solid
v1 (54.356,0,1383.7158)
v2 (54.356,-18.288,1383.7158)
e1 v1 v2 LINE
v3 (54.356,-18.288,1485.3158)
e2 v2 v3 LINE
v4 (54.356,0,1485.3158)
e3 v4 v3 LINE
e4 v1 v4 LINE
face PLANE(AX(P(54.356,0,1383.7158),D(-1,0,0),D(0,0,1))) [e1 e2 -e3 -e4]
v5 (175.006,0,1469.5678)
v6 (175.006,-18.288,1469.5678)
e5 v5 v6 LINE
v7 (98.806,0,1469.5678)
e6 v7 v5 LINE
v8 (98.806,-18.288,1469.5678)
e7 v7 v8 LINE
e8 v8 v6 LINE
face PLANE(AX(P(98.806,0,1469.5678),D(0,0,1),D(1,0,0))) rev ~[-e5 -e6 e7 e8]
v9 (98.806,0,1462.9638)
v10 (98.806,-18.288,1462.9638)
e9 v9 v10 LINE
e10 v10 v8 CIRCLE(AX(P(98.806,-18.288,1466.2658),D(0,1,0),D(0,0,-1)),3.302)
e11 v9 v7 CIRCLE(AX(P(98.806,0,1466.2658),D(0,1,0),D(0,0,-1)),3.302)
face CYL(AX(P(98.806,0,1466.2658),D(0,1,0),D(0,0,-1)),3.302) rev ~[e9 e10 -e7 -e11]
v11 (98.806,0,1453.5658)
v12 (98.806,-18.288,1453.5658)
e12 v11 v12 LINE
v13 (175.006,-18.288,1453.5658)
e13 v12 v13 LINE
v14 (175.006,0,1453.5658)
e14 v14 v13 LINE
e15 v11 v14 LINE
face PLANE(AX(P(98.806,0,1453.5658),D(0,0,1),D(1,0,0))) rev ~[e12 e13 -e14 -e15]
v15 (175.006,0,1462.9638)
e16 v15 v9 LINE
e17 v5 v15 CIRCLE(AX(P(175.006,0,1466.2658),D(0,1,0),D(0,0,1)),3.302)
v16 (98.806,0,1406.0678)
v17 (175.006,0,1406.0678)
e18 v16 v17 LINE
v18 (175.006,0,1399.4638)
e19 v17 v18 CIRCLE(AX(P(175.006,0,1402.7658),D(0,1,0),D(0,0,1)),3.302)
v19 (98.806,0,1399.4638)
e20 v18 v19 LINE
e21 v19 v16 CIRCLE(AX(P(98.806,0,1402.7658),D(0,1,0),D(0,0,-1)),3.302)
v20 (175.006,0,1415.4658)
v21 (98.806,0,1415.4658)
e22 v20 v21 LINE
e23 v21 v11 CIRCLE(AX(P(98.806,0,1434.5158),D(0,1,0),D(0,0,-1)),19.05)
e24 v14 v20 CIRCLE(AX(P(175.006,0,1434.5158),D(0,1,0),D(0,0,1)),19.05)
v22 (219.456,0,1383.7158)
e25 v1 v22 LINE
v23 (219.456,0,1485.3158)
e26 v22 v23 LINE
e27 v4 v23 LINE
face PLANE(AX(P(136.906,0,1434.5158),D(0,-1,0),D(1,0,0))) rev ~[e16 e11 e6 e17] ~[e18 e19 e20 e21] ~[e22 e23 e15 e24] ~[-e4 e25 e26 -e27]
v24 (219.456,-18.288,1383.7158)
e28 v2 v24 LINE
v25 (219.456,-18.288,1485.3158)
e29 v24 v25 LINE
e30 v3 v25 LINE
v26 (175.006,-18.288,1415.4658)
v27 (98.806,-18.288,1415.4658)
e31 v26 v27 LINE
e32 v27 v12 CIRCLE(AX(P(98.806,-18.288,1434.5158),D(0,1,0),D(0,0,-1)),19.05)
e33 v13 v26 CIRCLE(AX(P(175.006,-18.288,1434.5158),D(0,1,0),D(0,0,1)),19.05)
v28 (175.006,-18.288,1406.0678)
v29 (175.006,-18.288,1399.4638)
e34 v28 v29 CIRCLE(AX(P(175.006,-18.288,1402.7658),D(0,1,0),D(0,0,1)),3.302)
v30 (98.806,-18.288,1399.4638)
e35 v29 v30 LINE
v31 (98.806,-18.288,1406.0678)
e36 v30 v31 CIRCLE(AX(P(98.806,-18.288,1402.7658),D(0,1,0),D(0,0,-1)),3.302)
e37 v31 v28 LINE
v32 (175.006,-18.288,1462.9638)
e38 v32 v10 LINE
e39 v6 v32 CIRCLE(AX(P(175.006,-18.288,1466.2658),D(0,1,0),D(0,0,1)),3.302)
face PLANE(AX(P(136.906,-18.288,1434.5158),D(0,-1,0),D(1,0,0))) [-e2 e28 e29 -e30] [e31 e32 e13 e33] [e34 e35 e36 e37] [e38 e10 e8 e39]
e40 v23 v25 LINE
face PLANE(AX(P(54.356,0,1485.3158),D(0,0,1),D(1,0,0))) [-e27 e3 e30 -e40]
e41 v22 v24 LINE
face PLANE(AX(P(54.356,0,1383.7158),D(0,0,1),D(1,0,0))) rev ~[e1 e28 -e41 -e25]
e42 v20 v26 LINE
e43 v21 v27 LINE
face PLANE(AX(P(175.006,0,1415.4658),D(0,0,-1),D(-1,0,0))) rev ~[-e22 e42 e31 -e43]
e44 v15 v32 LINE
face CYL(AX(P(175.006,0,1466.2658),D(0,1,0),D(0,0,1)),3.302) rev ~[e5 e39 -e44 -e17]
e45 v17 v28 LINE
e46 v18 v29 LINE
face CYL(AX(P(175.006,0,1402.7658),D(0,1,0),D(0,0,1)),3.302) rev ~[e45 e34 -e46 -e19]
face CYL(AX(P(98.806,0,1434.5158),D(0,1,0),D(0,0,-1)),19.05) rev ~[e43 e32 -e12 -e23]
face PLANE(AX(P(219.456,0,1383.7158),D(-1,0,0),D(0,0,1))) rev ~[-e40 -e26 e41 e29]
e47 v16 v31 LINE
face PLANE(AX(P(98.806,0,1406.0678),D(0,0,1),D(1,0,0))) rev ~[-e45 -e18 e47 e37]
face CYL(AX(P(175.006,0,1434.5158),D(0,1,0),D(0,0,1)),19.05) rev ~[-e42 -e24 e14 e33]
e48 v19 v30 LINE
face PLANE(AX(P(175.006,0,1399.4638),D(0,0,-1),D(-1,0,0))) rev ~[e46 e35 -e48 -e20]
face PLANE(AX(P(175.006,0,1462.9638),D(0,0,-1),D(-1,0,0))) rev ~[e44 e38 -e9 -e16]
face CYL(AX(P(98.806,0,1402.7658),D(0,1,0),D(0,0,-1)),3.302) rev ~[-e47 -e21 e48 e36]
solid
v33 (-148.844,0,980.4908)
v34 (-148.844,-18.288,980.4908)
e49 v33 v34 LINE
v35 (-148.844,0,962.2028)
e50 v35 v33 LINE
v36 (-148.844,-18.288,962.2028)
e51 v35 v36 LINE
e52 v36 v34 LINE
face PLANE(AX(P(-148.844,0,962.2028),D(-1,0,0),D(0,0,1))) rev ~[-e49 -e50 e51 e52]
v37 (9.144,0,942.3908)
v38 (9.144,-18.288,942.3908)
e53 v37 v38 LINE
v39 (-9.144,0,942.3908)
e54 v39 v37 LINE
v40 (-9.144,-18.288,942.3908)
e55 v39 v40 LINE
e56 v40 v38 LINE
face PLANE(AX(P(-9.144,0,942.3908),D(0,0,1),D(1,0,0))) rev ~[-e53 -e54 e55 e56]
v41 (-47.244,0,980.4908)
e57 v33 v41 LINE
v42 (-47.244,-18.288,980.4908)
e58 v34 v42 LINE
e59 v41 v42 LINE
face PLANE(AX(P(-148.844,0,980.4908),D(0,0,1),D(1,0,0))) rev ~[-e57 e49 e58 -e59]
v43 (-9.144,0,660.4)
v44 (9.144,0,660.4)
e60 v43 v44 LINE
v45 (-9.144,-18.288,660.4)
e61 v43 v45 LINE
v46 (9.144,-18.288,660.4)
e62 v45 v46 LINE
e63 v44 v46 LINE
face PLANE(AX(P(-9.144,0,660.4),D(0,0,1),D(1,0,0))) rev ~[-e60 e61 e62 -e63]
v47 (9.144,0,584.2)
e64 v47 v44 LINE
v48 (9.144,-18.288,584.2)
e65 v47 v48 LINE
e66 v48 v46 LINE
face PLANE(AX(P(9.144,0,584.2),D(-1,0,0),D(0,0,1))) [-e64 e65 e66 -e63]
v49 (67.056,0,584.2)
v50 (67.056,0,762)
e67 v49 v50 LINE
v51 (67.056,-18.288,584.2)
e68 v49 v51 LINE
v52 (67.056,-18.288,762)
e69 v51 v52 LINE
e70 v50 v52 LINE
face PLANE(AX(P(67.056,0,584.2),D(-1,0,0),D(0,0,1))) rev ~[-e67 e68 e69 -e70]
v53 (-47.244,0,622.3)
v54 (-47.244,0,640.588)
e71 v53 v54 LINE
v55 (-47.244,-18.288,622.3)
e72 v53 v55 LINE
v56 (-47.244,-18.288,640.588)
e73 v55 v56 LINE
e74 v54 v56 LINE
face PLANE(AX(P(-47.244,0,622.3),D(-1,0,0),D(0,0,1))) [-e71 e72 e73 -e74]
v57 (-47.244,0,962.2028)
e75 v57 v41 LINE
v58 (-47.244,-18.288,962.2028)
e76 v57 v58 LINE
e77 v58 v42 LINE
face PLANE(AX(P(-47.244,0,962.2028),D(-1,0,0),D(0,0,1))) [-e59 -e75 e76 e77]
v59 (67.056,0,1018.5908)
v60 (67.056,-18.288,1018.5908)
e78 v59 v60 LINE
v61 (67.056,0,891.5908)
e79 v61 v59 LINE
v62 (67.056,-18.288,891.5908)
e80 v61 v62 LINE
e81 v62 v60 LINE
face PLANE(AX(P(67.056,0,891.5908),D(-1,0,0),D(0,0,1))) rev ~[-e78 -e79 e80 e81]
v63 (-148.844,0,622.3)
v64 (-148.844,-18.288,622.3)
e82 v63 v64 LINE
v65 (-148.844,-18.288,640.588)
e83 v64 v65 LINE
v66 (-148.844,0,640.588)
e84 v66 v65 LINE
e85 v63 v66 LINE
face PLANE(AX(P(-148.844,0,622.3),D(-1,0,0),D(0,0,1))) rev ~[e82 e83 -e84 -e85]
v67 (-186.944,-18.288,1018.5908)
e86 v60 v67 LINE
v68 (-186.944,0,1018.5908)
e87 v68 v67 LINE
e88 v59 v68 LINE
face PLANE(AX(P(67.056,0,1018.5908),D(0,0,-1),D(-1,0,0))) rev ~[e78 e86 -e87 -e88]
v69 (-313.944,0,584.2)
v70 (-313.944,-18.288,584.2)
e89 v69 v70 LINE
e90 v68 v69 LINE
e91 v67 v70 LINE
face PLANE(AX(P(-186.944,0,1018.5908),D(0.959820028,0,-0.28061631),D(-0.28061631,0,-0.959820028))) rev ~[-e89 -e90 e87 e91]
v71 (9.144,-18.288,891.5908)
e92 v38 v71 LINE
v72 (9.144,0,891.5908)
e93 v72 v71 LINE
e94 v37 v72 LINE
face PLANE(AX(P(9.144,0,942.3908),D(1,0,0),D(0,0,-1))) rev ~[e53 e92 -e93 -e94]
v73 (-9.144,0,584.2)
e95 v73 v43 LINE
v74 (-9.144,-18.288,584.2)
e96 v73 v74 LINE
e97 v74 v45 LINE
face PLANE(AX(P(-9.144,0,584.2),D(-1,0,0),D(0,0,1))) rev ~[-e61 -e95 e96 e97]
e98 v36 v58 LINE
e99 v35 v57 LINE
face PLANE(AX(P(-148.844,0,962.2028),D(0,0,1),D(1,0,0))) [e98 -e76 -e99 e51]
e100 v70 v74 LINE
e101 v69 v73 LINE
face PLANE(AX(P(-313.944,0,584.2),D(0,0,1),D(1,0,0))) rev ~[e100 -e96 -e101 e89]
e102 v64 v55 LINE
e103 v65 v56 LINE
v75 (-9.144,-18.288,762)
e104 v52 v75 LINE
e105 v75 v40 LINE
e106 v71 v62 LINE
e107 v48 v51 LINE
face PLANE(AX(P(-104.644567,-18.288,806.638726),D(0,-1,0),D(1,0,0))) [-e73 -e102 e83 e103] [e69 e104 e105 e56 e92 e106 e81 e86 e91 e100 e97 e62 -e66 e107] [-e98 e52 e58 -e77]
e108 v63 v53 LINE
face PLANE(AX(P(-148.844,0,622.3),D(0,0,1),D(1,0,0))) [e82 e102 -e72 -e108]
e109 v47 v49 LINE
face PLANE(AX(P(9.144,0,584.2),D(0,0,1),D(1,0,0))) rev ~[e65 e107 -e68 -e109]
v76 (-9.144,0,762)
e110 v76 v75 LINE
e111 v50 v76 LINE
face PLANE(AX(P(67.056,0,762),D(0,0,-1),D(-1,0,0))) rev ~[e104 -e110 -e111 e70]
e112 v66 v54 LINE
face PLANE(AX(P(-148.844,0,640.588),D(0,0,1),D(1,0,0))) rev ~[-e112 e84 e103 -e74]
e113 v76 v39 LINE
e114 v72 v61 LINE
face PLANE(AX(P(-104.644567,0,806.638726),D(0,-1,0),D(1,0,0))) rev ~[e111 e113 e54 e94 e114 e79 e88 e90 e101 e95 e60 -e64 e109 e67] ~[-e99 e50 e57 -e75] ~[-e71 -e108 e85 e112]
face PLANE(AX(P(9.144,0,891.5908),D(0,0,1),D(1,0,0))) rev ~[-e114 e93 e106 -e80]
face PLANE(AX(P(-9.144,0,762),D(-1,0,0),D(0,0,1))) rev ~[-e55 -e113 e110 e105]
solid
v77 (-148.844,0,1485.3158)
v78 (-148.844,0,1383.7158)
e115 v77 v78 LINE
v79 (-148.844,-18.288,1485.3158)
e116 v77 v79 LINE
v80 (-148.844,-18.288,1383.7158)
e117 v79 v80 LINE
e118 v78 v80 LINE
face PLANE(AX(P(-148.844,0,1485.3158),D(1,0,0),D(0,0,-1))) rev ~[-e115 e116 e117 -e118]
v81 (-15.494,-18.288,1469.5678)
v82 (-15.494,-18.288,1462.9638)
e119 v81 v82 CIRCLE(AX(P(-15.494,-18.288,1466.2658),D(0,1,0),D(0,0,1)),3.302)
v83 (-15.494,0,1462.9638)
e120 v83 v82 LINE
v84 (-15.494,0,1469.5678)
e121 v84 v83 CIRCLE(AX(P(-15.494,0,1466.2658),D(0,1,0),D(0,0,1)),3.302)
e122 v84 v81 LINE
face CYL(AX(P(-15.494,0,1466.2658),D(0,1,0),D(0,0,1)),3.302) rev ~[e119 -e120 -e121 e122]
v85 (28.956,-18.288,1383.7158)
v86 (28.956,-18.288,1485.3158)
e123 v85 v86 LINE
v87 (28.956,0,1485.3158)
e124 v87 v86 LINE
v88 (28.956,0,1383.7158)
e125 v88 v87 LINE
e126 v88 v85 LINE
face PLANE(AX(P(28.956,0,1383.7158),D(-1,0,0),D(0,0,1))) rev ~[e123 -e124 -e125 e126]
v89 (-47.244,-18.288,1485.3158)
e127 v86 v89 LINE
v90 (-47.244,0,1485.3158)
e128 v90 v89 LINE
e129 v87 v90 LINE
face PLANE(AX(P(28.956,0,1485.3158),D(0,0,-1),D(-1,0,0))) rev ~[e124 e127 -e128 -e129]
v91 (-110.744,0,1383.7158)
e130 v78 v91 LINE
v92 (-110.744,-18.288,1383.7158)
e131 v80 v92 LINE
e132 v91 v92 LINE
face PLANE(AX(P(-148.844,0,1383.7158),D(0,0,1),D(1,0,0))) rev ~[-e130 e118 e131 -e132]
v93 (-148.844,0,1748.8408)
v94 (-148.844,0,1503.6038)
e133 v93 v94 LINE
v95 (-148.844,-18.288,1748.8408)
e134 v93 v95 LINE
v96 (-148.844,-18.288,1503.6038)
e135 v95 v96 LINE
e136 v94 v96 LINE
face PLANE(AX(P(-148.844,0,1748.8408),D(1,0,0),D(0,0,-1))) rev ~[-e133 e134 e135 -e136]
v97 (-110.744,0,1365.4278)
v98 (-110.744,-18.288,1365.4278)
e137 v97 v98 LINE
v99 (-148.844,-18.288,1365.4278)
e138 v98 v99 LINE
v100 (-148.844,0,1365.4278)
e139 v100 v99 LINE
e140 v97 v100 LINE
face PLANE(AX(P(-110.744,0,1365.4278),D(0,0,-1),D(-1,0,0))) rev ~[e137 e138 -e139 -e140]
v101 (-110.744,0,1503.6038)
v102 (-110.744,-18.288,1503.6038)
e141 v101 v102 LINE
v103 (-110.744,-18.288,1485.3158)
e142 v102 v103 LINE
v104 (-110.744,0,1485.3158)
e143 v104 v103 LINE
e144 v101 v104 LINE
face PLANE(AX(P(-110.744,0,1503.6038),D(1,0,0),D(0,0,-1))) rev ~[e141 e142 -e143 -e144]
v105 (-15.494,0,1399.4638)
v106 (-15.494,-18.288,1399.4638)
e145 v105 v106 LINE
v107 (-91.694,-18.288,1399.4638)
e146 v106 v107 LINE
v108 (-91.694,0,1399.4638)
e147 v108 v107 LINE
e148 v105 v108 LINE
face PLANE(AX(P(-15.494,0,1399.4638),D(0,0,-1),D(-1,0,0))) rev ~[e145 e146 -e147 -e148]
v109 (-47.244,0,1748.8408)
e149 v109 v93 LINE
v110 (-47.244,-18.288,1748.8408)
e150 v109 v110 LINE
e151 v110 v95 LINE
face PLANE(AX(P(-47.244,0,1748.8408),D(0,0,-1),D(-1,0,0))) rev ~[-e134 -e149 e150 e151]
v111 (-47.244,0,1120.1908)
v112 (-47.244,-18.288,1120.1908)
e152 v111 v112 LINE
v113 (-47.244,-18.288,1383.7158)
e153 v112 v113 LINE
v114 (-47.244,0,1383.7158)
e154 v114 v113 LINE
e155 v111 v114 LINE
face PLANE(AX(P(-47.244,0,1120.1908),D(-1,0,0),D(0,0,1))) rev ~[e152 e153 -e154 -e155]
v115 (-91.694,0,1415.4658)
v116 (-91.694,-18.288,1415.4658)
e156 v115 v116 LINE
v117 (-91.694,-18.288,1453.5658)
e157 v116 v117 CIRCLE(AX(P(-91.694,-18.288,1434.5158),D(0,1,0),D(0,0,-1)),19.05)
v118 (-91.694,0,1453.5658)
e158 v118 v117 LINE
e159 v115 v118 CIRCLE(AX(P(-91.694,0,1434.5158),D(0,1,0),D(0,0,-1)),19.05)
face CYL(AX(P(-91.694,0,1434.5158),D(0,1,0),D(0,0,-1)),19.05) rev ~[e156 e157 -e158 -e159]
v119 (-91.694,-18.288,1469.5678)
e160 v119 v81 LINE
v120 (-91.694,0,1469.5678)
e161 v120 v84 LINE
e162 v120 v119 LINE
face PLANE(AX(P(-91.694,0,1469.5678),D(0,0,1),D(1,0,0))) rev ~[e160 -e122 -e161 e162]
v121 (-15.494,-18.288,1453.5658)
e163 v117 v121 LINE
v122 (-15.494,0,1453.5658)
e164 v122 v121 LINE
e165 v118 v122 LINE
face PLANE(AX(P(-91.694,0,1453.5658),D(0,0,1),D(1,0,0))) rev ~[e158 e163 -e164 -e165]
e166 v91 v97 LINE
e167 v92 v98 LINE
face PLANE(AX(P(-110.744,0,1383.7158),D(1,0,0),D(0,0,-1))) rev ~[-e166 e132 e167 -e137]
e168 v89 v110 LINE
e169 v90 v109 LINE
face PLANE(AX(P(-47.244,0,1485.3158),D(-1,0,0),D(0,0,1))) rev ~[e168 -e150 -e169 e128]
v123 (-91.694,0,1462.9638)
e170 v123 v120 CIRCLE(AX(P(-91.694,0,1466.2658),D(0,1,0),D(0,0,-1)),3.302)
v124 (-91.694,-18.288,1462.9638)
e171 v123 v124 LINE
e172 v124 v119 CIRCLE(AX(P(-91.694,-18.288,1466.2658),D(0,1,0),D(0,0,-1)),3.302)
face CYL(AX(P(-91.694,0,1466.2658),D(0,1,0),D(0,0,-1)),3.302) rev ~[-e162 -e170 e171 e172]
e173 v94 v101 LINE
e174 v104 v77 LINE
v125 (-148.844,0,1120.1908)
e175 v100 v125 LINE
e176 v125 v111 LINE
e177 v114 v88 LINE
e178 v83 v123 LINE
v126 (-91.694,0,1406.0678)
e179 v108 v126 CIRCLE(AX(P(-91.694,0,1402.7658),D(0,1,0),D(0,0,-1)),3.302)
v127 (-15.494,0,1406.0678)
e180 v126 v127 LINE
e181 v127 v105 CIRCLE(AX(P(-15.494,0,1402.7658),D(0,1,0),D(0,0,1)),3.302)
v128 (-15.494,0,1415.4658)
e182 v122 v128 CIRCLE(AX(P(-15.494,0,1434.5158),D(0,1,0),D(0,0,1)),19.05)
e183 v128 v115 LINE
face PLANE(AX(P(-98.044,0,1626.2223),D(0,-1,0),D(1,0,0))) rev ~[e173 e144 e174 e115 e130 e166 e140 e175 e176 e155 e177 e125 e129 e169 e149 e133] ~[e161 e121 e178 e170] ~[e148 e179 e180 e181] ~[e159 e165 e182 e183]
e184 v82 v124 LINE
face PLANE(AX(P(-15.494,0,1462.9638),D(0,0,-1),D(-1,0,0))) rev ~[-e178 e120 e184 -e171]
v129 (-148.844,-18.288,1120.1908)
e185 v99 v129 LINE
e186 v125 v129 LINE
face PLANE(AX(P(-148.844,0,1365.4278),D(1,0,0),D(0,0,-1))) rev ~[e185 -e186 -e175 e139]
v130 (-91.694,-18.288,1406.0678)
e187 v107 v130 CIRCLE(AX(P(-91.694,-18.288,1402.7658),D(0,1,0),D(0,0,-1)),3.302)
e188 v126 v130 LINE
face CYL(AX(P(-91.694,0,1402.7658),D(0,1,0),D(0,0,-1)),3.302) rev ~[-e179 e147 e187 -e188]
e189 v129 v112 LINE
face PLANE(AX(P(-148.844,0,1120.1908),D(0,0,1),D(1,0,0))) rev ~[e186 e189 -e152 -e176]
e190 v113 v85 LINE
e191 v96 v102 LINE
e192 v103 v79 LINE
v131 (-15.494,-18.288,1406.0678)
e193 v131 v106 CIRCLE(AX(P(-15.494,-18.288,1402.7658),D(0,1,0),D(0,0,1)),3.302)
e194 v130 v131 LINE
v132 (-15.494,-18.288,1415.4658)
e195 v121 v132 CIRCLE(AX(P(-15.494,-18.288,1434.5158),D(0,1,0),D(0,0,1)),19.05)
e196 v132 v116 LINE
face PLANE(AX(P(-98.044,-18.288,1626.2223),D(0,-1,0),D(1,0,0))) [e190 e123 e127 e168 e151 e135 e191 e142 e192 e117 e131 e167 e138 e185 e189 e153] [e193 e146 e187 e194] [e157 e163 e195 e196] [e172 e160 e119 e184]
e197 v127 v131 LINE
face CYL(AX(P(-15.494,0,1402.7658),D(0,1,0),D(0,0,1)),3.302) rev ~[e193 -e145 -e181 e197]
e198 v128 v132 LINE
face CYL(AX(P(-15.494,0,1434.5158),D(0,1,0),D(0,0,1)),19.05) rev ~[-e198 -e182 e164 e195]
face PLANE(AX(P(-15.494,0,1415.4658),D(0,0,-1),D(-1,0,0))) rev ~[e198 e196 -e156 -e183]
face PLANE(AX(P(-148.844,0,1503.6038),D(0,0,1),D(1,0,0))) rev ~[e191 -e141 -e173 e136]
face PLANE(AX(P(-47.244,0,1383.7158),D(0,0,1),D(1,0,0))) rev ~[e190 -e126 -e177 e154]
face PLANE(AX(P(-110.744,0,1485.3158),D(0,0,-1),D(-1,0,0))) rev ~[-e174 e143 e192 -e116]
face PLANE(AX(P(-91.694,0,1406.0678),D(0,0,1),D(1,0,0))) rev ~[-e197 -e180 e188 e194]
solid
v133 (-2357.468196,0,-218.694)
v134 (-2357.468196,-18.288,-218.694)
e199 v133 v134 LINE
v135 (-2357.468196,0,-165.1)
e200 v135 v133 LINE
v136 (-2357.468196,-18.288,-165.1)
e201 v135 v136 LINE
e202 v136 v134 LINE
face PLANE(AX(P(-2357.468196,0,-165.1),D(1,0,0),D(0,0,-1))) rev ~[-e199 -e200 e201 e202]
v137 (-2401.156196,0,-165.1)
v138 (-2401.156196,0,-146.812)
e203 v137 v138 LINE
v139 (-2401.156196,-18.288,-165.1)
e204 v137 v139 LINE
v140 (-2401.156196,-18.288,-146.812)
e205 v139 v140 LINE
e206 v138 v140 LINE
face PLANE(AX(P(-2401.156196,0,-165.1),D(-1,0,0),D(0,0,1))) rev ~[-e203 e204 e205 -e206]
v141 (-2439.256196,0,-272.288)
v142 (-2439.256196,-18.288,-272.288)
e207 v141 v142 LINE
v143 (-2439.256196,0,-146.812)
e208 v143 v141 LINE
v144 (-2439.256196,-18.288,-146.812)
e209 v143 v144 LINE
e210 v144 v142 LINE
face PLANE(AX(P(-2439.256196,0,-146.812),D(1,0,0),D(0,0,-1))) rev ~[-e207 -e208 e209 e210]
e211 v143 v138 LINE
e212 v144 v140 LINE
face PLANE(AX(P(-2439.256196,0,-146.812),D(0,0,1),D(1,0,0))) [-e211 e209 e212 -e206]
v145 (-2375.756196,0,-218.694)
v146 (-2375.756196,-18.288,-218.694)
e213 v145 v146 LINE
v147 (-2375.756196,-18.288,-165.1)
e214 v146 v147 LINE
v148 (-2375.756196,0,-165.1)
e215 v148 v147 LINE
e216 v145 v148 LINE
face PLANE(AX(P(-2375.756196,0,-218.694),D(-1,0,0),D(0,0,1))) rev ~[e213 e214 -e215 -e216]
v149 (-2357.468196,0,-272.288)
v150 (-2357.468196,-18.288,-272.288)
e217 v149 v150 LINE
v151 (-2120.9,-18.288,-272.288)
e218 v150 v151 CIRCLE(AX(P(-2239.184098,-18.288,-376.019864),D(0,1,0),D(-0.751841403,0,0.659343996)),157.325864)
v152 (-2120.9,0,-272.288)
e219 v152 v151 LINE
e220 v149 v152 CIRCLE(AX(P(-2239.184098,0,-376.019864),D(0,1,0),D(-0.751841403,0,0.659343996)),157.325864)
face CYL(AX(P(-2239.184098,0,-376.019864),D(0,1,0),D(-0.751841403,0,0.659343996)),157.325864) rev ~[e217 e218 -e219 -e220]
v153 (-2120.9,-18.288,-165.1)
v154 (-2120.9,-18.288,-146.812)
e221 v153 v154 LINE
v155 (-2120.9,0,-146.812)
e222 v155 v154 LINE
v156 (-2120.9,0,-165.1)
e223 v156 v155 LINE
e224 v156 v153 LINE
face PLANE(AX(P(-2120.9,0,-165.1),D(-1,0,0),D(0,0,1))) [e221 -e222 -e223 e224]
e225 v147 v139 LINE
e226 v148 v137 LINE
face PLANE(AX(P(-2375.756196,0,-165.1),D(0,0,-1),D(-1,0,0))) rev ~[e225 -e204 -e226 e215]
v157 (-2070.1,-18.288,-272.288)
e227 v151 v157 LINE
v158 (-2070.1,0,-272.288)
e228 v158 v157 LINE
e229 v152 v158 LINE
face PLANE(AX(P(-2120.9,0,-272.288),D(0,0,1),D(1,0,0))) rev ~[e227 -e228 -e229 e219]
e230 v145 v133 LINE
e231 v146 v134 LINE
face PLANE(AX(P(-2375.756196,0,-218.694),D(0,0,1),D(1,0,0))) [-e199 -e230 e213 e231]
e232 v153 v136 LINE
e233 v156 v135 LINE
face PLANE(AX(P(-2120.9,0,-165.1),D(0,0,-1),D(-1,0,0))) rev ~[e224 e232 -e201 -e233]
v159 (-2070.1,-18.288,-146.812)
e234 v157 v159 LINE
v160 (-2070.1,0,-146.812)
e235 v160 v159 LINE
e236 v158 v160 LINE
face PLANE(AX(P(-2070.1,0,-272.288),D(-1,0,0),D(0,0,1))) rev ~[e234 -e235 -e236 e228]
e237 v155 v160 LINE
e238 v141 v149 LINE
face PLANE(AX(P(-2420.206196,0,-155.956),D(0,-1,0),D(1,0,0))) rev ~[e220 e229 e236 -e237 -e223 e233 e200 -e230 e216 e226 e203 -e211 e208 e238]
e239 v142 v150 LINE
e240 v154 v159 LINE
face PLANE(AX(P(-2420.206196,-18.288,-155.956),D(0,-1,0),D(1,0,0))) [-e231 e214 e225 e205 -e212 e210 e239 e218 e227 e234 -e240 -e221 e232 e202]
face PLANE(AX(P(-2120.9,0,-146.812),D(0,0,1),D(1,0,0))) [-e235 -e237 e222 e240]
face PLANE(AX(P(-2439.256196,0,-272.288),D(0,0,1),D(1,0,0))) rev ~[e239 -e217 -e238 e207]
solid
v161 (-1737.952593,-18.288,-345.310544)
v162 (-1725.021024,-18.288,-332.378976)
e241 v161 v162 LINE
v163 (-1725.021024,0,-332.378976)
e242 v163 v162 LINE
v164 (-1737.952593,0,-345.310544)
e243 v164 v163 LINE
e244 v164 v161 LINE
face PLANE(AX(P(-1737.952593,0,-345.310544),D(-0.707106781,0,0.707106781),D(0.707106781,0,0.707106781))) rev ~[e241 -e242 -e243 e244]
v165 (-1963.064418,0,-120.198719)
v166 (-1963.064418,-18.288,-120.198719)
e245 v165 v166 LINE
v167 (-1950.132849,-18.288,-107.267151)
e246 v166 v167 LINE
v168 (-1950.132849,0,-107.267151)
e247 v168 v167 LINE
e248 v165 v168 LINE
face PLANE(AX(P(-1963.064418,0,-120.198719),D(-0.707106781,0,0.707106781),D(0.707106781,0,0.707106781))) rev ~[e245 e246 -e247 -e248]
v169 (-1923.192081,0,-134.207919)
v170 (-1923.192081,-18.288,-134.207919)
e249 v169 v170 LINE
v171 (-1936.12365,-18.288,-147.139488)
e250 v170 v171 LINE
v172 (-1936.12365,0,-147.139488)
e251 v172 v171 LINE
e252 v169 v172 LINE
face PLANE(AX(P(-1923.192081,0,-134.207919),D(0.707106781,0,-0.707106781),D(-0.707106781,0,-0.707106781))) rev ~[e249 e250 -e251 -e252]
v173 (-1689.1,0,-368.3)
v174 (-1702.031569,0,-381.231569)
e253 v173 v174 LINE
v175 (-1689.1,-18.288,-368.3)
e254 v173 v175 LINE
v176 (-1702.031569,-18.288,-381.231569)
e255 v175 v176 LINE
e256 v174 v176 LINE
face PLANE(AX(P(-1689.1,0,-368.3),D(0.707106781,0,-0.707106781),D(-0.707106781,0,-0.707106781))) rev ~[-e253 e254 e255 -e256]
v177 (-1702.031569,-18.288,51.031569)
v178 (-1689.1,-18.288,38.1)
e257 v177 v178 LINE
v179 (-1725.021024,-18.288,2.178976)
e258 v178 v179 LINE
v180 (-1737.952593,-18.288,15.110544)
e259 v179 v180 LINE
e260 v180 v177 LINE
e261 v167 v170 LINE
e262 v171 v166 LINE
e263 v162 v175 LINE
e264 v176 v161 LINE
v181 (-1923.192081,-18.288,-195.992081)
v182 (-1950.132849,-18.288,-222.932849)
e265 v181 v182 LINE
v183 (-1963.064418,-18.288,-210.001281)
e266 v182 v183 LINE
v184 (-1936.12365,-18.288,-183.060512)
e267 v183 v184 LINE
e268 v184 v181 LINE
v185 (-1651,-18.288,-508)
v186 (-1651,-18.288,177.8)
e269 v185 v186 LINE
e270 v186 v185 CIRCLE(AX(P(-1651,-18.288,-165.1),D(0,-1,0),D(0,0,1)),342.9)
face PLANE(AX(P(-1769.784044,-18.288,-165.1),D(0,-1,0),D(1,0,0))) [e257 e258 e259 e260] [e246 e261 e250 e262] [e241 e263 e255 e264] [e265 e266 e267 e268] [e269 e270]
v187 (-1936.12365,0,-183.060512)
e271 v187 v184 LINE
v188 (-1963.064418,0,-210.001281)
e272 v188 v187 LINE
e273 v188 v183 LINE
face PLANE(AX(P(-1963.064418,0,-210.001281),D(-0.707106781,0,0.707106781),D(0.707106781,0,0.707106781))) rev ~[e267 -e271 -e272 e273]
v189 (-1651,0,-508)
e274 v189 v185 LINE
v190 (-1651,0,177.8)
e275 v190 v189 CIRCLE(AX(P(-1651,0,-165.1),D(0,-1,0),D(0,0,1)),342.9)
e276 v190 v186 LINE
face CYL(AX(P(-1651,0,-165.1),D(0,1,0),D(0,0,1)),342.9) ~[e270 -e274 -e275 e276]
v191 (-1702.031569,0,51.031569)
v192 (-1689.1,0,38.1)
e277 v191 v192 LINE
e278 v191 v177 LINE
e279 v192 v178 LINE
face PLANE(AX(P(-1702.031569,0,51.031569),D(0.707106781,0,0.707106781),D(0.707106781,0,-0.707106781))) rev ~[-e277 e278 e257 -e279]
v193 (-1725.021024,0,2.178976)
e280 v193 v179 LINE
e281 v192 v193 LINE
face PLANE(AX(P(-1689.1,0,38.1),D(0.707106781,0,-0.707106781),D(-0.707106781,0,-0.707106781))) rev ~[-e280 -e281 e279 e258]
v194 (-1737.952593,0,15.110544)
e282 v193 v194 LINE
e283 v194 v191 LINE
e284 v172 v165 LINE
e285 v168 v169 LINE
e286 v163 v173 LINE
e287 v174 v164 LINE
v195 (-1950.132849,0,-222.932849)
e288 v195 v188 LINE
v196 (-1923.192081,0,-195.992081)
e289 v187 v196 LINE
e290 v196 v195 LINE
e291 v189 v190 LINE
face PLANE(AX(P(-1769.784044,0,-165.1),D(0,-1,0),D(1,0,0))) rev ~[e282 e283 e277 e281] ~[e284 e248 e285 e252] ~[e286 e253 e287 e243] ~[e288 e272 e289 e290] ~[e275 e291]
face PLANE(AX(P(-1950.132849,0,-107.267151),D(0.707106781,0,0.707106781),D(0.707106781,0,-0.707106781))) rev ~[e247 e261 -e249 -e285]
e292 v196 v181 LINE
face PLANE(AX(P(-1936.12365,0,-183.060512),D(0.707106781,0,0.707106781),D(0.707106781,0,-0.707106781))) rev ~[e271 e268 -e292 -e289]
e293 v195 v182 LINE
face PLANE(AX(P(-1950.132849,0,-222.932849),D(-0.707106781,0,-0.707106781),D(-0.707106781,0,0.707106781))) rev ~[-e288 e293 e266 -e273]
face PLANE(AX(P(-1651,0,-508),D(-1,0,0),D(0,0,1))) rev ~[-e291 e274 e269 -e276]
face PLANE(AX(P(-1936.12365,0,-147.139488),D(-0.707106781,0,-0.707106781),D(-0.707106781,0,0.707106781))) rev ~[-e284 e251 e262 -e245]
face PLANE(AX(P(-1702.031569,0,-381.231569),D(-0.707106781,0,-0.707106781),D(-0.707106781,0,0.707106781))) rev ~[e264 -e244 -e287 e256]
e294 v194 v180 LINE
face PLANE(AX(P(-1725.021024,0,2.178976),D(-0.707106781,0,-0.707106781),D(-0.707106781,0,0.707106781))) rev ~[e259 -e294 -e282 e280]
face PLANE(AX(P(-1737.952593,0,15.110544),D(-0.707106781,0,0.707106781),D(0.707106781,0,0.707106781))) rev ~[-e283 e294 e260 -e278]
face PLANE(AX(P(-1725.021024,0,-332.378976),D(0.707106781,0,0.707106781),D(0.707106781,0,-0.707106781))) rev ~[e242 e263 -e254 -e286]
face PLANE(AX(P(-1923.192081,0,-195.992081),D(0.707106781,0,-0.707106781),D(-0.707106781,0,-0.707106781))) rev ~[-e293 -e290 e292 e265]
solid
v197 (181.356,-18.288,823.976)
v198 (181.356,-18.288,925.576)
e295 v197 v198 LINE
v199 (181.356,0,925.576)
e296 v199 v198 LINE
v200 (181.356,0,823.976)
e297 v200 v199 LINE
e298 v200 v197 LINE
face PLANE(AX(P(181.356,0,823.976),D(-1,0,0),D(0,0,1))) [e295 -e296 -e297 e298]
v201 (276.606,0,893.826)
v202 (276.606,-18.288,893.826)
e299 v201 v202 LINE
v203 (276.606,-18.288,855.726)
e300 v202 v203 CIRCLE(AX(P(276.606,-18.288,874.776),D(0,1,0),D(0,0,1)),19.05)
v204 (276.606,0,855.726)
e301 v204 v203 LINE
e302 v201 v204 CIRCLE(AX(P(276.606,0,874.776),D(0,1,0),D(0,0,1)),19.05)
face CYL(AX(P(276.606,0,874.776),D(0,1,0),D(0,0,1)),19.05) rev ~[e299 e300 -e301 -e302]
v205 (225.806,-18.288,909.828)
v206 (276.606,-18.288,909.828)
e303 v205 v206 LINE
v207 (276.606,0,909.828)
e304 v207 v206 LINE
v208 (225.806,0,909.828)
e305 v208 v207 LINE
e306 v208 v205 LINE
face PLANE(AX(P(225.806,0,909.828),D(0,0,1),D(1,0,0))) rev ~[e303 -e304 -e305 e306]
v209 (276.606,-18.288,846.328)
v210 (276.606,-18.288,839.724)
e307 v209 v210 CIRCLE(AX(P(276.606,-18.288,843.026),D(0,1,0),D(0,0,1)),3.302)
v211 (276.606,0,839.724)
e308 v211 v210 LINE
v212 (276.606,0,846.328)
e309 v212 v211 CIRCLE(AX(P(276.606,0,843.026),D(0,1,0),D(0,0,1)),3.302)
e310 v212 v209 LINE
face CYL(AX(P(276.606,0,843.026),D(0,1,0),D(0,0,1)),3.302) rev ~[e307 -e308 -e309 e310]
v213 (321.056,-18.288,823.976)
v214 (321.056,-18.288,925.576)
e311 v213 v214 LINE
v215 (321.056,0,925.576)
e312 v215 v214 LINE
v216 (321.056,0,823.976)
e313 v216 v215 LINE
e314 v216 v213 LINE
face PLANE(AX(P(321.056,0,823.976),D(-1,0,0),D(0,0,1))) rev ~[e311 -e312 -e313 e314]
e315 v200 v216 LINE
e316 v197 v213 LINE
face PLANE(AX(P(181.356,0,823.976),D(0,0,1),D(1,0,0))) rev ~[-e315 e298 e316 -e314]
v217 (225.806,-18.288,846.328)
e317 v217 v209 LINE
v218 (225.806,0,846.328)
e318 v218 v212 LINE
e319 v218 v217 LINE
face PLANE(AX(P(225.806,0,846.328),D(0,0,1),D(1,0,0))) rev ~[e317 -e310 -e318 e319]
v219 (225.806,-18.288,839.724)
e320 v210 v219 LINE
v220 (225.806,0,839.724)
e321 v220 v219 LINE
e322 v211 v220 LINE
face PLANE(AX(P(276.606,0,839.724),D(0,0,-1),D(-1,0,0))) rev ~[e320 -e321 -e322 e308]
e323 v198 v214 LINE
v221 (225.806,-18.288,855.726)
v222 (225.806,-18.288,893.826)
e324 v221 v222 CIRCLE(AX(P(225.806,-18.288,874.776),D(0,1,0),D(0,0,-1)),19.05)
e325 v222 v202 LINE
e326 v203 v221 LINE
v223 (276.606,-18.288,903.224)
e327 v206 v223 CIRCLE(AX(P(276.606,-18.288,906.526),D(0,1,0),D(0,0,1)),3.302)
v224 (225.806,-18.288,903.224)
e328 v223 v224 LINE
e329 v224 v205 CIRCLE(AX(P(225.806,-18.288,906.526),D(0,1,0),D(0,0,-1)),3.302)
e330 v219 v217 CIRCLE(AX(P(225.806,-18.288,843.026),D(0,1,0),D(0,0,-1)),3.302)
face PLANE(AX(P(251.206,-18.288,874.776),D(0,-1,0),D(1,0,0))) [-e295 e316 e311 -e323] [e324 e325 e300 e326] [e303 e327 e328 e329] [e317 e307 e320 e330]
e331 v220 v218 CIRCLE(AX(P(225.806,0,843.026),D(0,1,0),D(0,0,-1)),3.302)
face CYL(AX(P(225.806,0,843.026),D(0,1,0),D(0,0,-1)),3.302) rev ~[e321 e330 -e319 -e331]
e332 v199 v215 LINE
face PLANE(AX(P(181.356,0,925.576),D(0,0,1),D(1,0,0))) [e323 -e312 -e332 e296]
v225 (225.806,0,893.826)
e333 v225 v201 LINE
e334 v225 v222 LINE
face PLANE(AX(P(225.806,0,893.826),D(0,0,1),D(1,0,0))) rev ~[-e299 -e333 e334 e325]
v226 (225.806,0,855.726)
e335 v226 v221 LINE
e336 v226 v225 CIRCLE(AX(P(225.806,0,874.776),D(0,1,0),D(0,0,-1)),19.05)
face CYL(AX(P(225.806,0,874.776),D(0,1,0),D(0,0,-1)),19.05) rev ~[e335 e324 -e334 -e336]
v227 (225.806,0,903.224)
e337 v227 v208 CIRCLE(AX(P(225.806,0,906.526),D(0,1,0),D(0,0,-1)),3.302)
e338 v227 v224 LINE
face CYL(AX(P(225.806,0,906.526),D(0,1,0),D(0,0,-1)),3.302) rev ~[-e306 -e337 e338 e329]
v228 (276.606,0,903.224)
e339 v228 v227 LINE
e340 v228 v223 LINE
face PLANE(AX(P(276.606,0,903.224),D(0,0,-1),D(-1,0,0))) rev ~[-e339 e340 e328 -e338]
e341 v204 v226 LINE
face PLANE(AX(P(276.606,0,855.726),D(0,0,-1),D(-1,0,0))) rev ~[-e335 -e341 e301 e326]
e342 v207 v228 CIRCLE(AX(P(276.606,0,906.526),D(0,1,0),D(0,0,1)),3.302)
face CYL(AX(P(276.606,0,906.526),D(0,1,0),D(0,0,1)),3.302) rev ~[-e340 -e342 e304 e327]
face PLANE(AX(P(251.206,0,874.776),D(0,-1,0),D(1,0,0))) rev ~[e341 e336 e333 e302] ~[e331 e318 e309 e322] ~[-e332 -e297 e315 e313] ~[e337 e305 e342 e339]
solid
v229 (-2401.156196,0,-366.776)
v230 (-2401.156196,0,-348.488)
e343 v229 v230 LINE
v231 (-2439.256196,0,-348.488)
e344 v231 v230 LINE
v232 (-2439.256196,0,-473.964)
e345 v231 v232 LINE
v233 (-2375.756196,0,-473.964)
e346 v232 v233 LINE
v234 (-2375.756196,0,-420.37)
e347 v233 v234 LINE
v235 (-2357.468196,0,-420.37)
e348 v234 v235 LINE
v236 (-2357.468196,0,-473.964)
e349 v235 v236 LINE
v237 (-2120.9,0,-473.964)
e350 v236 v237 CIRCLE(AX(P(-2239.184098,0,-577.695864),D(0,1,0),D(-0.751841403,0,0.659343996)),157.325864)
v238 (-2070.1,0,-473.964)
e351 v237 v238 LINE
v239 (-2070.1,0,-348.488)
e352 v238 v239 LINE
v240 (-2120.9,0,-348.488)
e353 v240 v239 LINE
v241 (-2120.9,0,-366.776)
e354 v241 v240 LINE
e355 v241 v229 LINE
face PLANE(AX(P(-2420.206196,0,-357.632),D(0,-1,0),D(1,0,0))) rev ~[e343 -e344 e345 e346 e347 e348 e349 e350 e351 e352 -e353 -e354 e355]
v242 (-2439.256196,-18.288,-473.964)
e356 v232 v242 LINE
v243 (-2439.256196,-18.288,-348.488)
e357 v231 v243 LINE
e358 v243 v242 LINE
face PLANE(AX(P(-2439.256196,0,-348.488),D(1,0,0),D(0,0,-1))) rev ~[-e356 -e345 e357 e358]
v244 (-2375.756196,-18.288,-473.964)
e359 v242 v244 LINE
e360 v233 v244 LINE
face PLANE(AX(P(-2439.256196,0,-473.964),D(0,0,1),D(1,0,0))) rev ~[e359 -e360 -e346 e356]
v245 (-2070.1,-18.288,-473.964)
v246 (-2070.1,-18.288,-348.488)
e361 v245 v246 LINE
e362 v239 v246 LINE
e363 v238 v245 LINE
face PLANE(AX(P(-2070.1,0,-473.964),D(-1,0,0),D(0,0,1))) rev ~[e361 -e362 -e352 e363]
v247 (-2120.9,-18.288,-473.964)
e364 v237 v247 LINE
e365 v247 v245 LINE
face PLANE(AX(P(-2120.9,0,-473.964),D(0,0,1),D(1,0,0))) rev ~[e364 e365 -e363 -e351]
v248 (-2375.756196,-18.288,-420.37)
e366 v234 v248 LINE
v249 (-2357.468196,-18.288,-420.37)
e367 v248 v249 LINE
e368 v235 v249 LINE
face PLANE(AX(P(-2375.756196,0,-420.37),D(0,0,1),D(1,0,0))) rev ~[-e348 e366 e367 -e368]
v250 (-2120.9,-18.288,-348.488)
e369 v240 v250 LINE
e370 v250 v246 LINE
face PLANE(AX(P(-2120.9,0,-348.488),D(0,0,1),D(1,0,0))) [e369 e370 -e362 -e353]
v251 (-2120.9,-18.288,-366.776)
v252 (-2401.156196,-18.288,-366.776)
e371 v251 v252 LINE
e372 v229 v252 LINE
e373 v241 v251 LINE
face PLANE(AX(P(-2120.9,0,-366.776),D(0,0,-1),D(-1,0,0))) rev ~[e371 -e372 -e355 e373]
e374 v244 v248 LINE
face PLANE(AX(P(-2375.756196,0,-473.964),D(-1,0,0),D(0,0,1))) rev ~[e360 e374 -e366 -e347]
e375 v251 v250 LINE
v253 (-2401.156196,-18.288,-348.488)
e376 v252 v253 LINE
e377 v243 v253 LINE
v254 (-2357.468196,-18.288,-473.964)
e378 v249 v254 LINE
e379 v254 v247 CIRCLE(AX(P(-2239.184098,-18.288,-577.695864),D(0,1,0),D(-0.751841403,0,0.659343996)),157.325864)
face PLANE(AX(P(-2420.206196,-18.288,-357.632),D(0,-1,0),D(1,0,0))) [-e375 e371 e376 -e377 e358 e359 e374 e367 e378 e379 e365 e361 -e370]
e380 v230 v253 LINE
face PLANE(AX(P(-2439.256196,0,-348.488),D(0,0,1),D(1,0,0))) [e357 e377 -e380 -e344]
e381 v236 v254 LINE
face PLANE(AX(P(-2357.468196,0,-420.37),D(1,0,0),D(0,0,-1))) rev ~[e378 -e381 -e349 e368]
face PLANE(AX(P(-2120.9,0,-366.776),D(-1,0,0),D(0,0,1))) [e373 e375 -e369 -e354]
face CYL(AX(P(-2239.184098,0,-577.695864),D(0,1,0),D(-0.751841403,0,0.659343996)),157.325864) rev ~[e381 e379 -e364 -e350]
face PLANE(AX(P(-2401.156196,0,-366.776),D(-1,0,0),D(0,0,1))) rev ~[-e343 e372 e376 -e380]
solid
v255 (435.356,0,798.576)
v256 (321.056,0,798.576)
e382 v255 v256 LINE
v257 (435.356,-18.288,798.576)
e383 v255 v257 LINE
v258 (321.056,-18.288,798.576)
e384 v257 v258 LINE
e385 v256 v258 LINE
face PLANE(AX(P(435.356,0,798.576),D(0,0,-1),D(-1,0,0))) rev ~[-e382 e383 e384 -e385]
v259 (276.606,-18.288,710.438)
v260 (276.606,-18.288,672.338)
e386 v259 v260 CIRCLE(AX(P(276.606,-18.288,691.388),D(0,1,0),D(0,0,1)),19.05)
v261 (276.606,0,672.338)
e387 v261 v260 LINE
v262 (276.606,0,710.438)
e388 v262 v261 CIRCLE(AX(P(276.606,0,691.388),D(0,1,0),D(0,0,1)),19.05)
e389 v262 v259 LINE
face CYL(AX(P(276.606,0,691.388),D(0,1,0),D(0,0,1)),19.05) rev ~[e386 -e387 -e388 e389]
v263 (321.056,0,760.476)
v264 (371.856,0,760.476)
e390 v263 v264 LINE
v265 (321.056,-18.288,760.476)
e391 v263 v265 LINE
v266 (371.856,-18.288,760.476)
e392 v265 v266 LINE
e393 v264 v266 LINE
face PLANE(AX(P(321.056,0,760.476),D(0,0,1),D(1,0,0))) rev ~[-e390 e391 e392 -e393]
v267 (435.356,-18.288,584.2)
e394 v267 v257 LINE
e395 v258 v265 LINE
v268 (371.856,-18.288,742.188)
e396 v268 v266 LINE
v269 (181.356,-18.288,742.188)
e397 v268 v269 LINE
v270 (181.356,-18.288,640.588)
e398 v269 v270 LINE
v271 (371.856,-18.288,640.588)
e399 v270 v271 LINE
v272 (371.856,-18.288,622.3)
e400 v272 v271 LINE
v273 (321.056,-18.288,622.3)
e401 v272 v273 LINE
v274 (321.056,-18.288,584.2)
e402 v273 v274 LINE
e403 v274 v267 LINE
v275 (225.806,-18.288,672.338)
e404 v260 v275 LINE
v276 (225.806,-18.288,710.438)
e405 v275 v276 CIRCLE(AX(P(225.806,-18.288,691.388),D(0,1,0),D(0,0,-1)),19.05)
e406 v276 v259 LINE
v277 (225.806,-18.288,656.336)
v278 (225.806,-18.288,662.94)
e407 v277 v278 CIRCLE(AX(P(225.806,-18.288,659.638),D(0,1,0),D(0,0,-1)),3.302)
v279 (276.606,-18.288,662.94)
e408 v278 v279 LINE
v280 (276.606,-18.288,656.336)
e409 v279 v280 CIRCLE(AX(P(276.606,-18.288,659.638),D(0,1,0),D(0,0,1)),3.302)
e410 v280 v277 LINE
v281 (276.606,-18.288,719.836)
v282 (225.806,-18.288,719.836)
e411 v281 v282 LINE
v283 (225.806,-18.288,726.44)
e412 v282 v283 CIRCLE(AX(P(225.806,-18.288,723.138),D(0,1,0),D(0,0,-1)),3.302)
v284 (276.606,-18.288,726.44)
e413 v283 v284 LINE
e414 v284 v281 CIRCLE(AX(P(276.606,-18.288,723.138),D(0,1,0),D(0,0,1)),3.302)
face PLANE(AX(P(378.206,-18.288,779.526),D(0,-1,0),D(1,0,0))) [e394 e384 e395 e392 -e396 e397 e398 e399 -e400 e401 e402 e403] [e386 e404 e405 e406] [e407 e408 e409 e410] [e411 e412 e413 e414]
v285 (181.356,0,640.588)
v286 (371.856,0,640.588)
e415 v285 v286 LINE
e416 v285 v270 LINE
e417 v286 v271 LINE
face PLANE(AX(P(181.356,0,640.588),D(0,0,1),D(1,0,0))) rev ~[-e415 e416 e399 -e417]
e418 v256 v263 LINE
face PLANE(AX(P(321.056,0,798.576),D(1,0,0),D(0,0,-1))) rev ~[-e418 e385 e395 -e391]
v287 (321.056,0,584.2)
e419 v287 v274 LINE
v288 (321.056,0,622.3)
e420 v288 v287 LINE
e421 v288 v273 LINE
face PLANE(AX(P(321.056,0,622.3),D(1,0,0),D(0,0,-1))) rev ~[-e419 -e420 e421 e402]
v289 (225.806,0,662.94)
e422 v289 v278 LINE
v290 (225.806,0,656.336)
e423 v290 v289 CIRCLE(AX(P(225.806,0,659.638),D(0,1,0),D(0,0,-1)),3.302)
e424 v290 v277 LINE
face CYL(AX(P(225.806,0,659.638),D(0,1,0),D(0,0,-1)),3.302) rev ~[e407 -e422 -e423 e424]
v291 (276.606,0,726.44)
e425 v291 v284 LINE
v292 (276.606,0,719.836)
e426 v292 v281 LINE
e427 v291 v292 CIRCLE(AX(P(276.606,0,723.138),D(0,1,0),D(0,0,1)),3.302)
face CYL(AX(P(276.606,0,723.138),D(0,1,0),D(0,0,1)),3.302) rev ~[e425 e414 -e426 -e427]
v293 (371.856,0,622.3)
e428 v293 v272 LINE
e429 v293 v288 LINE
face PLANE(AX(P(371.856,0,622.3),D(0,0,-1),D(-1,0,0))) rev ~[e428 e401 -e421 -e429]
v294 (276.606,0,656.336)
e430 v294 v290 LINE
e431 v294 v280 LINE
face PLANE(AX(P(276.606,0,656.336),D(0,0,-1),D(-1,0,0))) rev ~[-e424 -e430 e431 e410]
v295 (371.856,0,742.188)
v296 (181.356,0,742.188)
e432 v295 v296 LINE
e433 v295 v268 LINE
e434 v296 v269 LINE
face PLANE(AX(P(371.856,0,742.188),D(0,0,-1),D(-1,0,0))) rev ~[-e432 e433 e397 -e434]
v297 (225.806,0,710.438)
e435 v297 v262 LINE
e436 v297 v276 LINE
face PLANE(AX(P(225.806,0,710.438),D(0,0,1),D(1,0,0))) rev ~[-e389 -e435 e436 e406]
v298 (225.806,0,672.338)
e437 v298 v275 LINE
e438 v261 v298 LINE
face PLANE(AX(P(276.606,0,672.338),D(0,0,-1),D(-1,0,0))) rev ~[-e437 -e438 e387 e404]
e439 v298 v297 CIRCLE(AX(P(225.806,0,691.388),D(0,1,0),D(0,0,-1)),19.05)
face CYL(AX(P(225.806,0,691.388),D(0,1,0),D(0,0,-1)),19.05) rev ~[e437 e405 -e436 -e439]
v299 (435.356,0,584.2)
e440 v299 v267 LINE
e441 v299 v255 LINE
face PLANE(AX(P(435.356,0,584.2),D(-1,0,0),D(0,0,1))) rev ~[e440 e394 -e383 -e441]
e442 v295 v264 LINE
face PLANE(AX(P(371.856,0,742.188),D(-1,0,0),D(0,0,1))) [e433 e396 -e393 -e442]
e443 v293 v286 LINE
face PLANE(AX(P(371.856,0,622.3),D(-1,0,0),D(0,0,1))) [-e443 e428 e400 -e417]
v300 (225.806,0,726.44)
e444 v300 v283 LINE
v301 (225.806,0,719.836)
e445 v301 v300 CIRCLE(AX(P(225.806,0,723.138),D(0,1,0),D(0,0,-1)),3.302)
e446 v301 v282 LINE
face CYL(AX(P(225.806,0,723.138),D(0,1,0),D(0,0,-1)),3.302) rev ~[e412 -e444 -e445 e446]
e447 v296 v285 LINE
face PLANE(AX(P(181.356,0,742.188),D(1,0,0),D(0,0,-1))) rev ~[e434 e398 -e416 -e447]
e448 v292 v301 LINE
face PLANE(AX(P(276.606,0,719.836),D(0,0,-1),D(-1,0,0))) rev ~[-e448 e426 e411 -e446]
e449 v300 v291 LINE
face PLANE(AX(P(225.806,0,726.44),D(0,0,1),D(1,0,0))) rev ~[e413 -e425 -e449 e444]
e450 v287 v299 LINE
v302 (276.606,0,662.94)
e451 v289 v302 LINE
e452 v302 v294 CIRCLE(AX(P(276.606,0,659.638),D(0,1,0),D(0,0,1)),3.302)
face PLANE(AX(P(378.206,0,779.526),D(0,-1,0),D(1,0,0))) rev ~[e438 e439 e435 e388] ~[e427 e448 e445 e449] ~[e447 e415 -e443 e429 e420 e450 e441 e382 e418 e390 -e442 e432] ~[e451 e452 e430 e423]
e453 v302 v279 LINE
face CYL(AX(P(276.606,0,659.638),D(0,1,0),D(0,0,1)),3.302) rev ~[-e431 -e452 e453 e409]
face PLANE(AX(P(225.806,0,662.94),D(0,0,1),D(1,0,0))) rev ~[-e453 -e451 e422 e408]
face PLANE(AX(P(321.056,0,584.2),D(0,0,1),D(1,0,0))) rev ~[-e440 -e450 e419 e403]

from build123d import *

# Parameters (mm, degrees)
F0_W     = 38.1
F0_H     = 18.288
F0_W_2   = 50.8
F0_W_3   = 18.288
F0_H_2   = 53.594
F1_DEPTH = 18.288
F0_W_4   = 101.6
F0_W_5   = 57.912
F0_H_3   = 76.2
F0_W_6   = 63.5
F0_W_7   = 139.7
F0_H_4   = 101.6
F0_W_8   = 165.1


# Not quite as in the source:
# - a feature names something its author has since deleted; it is built from what else it names


with BuildPart() as f1:
    # F0 (on Front) → F1 (new body)
    with BuildSketch(Plane.XZ):
        with Locations((-2420.2061958742, -155.956)):
            Rectangle(F0_W, F0_H)
        Polygon((-2401.1561958742, -165.1), (-2439.2561958742, -165.1), (-2439.2561958742, -272.288), (-2375.7561958742, -272.288), (-2375.7561958742, -218.694), (-2375.7561958742, -165.1), align=None)
        with BuildLine():
            Line((-2120.9, -165.1), (-2357.4681958742, -165.1))
            Line((-2357.4681958742, -165.1), (-2357.4681958742, -218.694))
            Line((-2357.4681958742, -218.694), (-2357.4681958742, -272.288))
            ThreePointArc((-2357.4681958742, -272.288), (-2239.1840979371, -218.694), (-2120.9, -272.288))
            Line((-2120.9, -272.288), (-2070.1, -272.288))
            Line((-2070.1, -272.288), (-2070.1, -165.1))
            Line((-2070.1, -165.1), (-2120.9, -165.1))
        make_face()
        with Locations((-2095.5, -155.956)):
            Rectangle(F0_W_2, F0_H)
        with Locations((-2366.6121958742, -245.491)):
            Rectangle(F0_W_3, F0_H_2)
    extrude(amount=F1_DEPTH)


with BuildPart() as f1b:
    # F0 (on Front) → F1, piece 2 (new body)
    with BuildSketch(Plane.XZ):
        with BuildLine():
            Line((-1651, -508), (-1651, 177.8))
            ThreePointArc((-1651, 177.8), (-1993.9, -165.1), (-1651, -508))
        make_face()
        Polygon((-1923.1920810565, -195.9920810565), (-1950.1328494197, -222.9328494197), (-1963.064418234, -210.0012806053), (-1936.1236498708, -183.0605122421), align=None, mode=Mode.SUBTRACT)
        Polygon((-1950.1328494197, -107.2671505803), (-1923.1920810565, -134.2079189435), (-1936.1236498708, -147.1394877579), (-1963.064418234, -120.1987193947), align=None, mode=Mode.SUBTRACT)
        Polygon((-1725.0210244843, -332.3789755157), (-1689.1, -368.3), (-1702.0315688143, -381.2315688143), (-1737.9525932986, -345.3105443301), align=None, mode=Mode.SUBTRACT)
        Polygon((-1702.0315688143, 51.0315688143), (-1689.1, 38.1), (-1725.0210244843, 2.1789755157), (-1737.9525932986, 15.1105443301), align=None, mode=Mode.SUBTRACT)
    extrude(amount=F1_DEPTH)


with BuildPart() as f1c:
    # F0 (on Front) → F1, piece 3 (new body)
    with BuildSketch(Plane.XZ):
        with Locations((-2420.2061958742, -357.632)):
            Rectangle(F0_W, F0_H)
        with BuildLine():
            Line((-2120.9, -366.776), (-2357.4681958742, -366.776))
            Line((-2357.4681958742, -366.776), (-2357.4681958742, -420.37))
            Line((-2357.4681958742, -420.37), (-2357.4681958742, -473.964))
            ThreePointArc((-2357.4681958742, -473.964), (-2239.1840979371, -420.37), (-2120.9, -473.964))
            Line((-2120.9, -473.964), (-2070.1, -473.964))
            Line((-2070.1, -473.964), (-2070.1, -366.776))
            Line((-2070.1, -366.776), (-2120.9, -366.776))
        make_face()
        with Locations((-2095.5, -357.632)):
            Rectangle(F0_W_2, F0_H)
        Polygon((-2401.1561958742, -366.776), (-2439.2561958742, -366.776), (-2439.2561958742, -473.964), (-2375.7561958742, -473.964), (-2375.7561958742, -420.37), (-2375.7561958742, -366.776), align=None)
        with Locations((-2366.6121958742, -393.573)):
            Rectangle(F0_W_3, F0_H_2)
    extrude(amount=F1_DEPTH)


with BuildPart() as f1d:
    # F0 (on Front) → F1, piece 4 (new body)
    with BuildSketch(Plane.XZ):
        Polygon((-98.044, 1503.6038), (-47.244, 1503.6038), (-47.244, 1748.8408), (-148.844, 1748.8408), (-148.844, 1503.6038), (-110.744, 1503.6038), align=None)
        Polygon((-98.044, 1485.3158), (-47.244, 1485.3158), (-47.244, 1503.6038), (-98.044, 1503.6038), (-110.744, 1503.6038), (-110.744, 1485.3158), align=None)
        Polygon((-98.044, 1383.7158), (-47.244, 1383.7158), (28.956, 1383.7158), (28.956, 1485.3158), (-47.244, 1485.3158), (-98.044, 1485.3158), (-110.744, 1485.3158), (-148.844, 1485.3158), (-148.844, 1383.7158), (-110.744, 1383.7158), align=None)
        with BuildLine():
            ThreePointArc((-91.694, 1399.4638), (-94.996, 1402.7658), (-91.694, 1406.0678))
            Line((-91.694, 1406.0678), (-15.494, 1406.0678))
            ThreePointArc((-15.494, 1406.0678), (-12.192, 1402.7658), (-15.494, 1399.4638))
            Line((-15.494, 1399.4638), (-91.694, 1399.4638))
        make_face(mode=Mode.SUBTRACT)
        with BuildLine():
            Line((-91.694, 1453.5658), (-15.494, 1453.5658))
            ThreePointArc((-15.494, 1453.5658), (3.556, 1434.5158), (-15.494, 1415.4658))
            Line((-15.494, 1415.4658), (-91.694, 1415.4658))
            ThreePointArc((-91.694, 1415.4658), (-110.744, 1434.5158), (-91.694, 1453.5658))
        make_face(mode=Mode.SUBTRACT)
        with BuildLine():
            Line((-15.494, 1462.9638), (-91.694, 1462.9638))
            ThreePointArc((-91.694, 1462.9638), (-94.996, 1466.2658), (-91.694, 1469.5678))
            Line((-91.694, 1469.5678), (-15.494, 1469.5678))
            ThreePointArc((-15.494, 1469.5678), (-12.192, 1466.2658), (-15.494, 1462.9638))
        make_face(mode=Mode.SUBTRACT)
        Polygon((-98.044, 1365.4278), (-47.244, 1365.4278), (-47.244, 1383.7158), (-98.044, 1383.7158), (-110.744, 1383.7158), (-110.744, 1365.4278), align=None)
        Polygon((-148.844, 1365.4278), (-148.844, 1120.1908), (-47.244, 1120.1908), (-47.244, 1365.4278), (-98.044, 1365.4278), (-110.744, 1365.4278), align=None)
    extrude(amount=F1_DEPTH)


with BuildPart() as f1e:
    # F0 (on Front) → F1, piece 5 (new body)
    with BuildSketch(Plane.XZ):
        Polygon((-9.144, 942.3908), (9.144, 942.3908), (9.144, 929.6908), (9.144, 891.5908), (67.056, 891.5908), (67.056, 929.6908), (67.056, 1018.5908), (-9.144, 1018.5908), (-186.944, 1018.5908), (-313.944, 584.2), (-9.144, 584.2), (-9.144, 660.4), (-9.144, 762), (-9.144, 929.6908), align=None)
        with Locations((-98.044, 631.444)):
            Rectangle(F0_W_4, F0_H, mode=Mode.SUBTRACT)
        with Locations((-98.044, 971.3468)):
            Rectangle(F0_W_4, F0_H, mode=Mode.SUBTRACT)
        Polygon((67.056, 762), (-9.144, 762), (-9.144, 660.4), (9.144, 660.4), (67.056, 660.4), align=None)
        with Locations((38.1, 622.3)):
            Rectangle(F0_W_5, F0_H_3)
    extrude(amount=F1_DEPTH)


with BuildPart() as f1f:
    # F0 (on Front) → F1, piece 6 (new body)
    with BuildSketch(Plane.XZ):
        Polygon((371.856, 760.476), (435.356, 760.476), (435.356, 798.576), (321.056, 798.576), (321.056, 760.476), align=None)
        with Locations((403.606, 751.332)):
            Rectangle(F0_W_6, F0_H)
        Polygon((181.356, 640.588), (371.856, 640.588), (435.356, 640.588), (435.356, 742.188), (371.856, 742.188), (181.356, 742.188), align=None)
        with BuildLine():
            ThreePointArc((276.606, 662.94), (279.908, 659.638), (276.606, 656.336))
            Line((276.606, 656.336), (225.806, 656.336))
            ThreePointArc((225.806, 656.336), (222.504, 659.638), (225.806, 662.94))
            Line((225.806, 662.94), (276.606, 662.94))
        make_face(mode=Mode.SUBTRACT)
        with BuildLine():
            Line((276.606, 672.338), (225.806, 672.338))
            ThreePointArc((225.806, 672.338), (206.756, 691.388), (225.806, 710.438))
            Line((225.806, 710.438), (276.606, 710.438))
            ThreePointArc((276.606, 710.438), (295.656, 691.388), (276.606, 672.338))
        make_face(mode=Mode.SUBTRACT)
        with BuildLine():
            Line((225.806, 726.44), (276.606, 726.44))
            ThreePointArc((276.606, 726.44), (279.908, 723.138), (276.606, 719.836))
            Line((276.606, 719.836), (225.806, 719.836))
            ThreePointArc((225.806, 719.836), (222.504, 723.138), (225.806, 726.44))
        make_face(mode=Mode.SUBTRACT)
        with Locations((403.606, 631.444)):
            Rectangle(F0_W_6, F0_H)
        Polygon((435.356, 622.3), (371.856, 622.3), (321.056, 622.3), (321.056, 584.2), (435.356, 584.2), align=None)
    extrude(amount=F1_DEPTH)


with BuildPart() as f1g:
    # F0 (on Front) → F1, piece 7 (new body)
    with BuildSketch(Plane.XZ):
        with Locations((251.206, 874.776)):
            Rectangle(F0_W_7, F0_H_4)
        with BuildLine():
            ThreePointArc((276.606, 846.328), (279.908, 843.026), (276.606, 839.724))
            Line((276.606, 839.724), (225.806, 839.724))
            ThreePointArc((225.806, 839.724), (222.504, 843.026), (225.806, 846.328))
            Line((225.806, 846.328), (276.606, 846.328))
        make_face(mode=Mode.SUBTRACT)
        with BuildLine():
            Line((276.606, 855.726), (225.806, 855.726))
            ThreePointArc((225.806, 855.726), (206.756, 874.776), (225.806, 893.826))
            Line((225.806, 893.826), (276.606, 893.826))
            ThreePointArc((276.606, 893.826), (295.656, 874.776), (276.606, 855.726))
        make_face(mode=Mode.SUBTRACT)
        with BuildLine():
            Line((276.606, 903.224), (225.806, 903.224))
            ThreePointArc((225.806, 903.224), (222.504, 906.526), (225.806, 909.828))
            Line((225.806, 909.828), (276.606, 909.828))
            ThreePointArc((276.606, 909.828), (279.908, 906.526), (276.606, 903.224))
        make_face(mode=Mode.SUBTRACT)
    extrude(amount=F1_DEPTH)


with BuildPart() as f1h:
    # F0 (on Front) → F1, piece 8 (new body)
    with BuildSketch(Plane.XZ):
        with Locations((136.906, 1434.5158)):
            Rectangle(F0_W_8, F0_H_4)
        with BuildLine():
            Line((98.806, 1406.0678), (175.006, 1406.0678))
            ThreePointArc((175.006, 1406.0678), (178.308, 1402.7658), (175.006, 1399.4638))
            Line((175.006, 1399.4638), (98.806, 1399.4638))
            ThreePointArc((98.806, 1399.4638), (95.504, 1402.7658), (98.806, 1406.0678))
        make_face(mode=Mode.SUBTRACT)
        with BuildLine():
            Line((175.006, 1415.4658), (98.806, 1415.4658))
            ThreePointArc((98.806, 1415.4658), (79.756, 1434.5158), (98.806, 1453.5658))
            Line((98.806, 1453.5658), (175.006, 1453.5658))
            ThreePointArc((175.006, 1453.5658), (194.056, 1434.5158), (175.006, 1415.4658))
        make_face(mode=Mode.SUBTRACT)
        with BuildLine():
            ThreePointArc((175.006, 1469.5678), (178.308, 1466.2658), (175.006, 1462.9638))
            Line((175.006, 1462.9638), (98.806, 1462.9638))
            ThreePointArc((98.806, 1462.9638), (95.504, 1466.2658), (98.806, 1469.5678))
            Line((98.806, 1469.5678), (175.006, 1469.5678))
        make_face(mode=Mode.SUBTRACT)
    extrude(amount=F1_DEPTH)


solid = Compound([f1.part, f1b.part, f1c.part, f1d.part, f1e.part, f1f.part, f1g.part, f1h.part])
